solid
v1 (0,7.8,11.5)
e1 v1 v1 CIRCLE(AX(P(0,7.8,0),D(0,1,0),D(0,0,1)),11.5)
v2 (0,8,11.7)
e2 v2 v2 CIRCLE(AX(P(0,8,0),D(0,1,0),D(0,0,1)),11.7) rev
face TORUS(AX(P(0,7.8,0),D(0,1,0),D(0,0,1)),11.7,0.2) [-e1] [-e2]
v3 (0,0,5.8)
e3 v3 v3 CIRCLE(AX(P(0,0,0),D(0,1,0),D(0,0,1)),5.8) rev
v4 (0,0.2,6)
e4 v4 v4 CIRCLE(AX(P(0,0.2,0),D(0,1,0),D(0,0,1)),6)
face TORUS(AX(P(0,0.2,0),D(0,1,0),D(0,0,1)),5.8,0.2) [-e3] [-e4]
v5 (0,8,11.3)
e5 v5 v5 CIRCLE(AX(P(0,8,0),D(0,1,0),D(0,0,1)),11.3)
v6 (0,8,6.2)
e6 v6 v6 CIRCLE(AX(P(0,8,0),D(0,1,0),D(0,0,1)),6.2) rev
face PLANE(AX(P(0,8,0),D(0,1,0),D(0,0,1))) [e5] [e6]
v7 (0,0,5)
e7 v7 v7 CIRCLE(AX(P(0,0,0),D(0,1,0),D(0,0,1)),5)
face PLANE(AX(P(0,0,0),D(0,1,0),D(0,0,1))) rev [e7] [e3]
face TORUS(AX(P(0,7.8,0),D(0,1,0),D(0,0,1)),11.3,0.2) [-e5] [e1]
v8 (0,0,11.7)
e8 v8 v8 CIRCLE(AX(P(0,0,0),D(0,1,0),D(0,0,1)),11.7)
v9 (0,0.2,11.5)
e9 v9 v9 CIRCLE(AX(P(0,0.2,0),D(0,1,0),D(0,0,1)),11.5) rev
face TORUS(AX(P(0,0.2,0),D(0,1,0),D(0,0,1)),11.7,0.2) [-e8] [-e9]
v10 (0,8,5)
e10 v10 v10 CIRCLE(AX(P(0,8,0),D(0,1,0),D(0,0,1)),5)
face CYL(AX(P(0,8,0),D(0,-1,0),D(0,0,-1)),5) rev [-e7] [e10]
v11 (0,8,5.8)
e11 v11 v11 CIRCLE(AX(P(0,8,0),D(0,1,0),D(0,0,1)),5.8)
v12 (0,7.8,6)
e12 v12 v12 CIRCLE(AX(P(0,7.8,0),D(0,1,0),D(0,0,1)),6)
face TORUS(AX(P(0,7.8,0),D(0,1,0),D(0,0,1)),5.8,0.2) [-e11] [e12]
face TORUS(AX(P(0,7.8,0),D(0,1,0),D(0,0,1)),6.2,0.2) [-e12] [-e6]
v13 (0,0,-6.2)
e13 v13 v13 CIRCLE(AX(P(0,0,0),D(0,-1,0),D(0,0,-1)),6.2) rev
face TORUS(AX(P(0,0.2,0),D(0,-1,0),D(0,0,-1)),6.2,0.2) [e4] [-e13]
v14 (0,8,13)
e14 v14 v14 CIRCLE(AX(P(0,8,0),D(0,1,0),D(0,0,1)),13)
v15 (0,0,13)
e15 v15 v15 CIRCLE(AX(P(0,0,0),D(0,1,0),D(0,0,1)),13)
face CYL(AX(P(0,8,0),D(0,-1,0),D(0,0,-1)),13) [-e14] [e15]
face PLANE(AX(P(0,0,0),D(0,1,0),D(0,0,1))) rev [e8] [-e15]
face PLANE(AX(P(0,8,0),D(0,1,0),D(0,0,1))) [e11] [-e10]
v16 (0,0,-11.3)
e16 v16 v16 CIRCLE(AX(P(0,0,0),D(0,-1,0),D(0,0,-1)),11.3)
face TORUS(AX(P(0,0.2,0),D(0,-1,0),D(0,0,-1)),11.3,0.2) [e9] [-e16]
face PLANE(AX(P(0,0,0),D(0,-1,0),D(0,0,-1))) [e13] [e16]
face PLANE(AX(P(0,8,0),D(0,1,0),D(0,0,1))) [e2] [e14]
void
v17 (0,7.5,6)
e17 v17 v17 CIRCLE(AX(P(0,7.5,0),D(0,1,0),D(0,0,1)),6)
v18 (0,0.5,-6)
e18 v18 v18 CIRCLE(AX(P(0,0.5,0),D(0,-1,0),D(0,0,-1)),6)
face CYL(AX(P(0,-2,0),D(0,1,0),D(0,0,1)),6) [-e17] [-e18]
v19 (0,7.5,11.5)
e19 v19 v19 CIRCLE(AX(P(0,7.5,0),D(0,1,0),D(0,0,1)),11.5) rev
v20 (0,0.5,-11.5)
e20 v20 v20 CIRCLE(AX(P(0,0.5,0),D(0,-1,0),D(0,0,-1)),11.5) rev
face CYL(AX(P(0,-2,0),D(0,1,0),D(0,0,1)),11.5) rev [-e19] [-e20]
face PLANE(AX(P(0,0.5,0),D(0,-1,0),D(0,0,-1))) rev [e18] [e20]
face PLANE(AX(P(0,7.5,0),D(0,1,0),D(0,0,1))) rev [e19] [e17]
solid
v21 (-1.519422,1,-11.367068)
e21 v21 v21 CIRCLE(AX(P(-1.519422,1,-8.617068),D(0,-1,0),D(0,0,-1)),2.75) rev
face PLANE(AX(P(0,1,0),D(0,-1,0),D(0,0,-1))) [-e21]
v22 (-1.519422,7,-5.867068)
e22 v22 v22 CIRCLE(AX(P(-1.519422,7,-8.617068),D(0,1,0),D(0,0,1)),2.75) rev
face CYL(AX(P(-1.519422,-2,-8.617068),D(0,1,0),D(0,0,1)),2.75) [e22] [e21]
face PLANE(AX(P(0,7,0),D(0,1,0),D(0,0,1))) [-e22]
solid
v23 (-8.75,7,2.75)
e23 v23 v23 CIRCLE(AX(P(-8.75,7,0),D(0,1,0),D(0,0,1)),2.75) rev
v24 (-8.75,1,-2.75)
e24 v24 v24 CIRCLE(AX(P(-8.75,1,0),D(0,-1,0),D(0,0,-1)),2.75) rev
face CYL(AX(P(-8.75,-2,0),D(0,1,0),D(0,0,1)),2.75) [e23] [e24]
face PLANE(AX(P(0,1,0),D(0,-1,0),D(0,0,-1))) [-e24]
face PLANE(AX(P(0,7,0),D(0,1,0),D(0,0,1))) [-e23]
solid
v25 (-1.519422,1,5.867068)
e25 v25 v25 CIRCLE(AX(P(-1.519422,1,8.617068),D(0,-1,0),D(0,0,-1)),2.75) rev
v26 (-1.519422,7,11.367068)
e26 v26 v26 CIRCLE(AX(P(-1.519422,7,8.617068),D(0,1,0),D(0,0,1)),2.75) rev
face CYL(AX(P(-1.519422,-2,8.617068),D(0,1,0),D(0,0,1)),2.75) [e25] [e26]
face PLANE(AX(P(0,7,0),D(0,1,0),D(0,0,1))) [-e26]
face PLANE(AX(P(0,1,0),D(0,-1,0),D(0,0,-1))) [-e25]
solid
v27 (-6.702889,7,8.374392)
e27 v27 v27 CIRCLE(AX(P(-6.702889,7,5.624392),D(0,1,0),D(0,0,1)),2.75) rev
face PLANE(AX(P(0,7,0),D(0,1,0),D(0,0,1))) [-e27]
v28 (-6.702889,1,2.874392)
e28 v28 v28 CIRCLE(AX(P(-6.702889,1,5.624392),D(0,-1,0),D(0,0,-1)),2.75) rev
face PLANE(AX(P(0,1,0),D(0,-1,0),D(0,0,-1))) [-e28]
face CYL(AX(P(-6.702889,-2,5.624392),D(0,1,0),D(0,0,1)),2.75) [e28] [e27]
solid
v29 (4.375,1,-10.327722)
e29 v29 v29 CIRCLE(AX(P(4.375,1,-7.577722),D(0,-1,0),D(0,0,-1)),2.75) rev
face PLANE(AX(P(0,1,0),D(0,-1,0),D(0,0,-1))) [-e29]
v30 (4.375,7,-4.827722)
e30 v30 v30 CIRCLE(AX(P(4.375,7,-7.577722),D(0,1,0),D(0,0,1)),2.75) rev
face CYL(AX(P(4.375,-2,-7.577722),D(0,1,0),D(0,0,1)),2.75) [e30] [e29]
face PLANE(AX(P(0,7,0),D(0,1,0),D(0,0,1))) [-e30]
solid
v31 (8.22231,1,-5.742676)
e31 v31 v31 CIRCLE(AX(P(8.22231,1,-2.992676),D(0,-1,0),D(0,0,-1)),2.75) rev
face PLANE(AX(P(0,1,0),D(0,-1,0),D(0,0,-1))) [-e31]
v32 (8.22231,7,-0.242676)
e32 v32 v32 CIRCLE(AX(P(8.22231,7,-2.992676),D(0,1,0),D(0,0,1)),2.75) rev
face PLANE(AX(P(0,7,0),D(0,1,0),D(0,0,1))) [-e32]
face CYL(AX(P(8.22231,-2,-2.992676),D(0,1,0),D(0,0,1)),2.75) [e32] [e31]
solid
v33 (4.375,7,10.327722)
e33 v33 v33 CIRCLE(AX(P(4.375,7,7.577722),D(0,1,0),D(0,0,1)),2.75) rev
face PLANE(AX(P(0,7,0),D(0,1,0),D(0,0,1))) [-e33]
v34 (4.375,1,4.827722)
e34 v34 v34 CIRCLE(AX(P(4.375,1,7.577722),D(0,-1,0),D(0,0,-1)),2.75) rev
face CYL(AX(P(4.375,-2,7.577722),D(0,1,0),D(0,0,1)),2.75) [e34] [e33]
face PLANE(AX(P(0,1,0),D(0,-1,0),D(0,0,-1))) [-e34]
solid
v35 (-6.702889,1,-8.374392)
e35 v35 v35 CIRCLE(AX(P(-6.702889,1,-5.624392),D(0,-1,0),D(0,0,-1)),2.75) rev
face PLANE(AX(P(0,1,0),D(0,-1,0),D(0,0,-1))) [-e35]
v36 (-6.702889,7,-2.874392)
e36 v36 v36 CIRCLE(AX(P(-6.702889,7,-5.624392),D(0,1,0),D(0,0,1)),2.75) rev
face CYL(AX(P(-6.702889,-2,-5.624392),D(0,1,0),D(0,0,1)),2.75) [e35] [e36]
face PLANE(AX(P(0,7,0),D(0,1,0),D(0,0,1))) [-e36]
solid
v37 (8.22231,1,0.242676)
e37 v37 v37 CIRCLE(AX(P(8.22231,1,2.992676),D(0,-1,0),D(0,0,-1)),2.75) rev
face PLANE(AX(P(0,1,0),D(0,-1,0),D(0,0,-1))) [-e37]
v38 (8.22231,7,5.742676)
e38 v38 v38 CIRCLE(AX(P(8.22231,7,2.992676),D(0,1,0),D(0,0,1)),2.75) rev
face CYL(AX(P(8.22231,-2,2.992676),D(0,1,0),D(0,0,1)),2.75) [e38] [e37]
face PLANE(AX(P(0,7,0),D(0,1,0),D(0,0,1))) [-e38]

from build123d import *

# Parameters (mm, degrees)
SKETCH2_R           = 13
SKETCH2_R_2         = 5
BOSS_EXTRUDE1_DEPTH = 8
SKETCH1_R           = 11.5
SKETCH1_R_2         = 6
SKETCH1_R_3         = 2.75
CUT_EXTRUDE2_DEPTH  = 10
SKETCH4_R           = 11.5
SKETCH4_R_2         = 6
CUT_EXTRUDE3_DEPTH  = 1
SKETCH5_R           = 11.5
SKETCH5_R_2         = 6
CUT_EXTRUDE4_DEPTH  = 1
FILLET1_R           = 0.2
FILLET2_R           = 0.2
SKETCH7_R           = 11.5
SKETCH7_R_2         = 6
BOSS_EXTRUDE2_DEPTH = 0.5
FILLET3_R           = 0.2
FILLET4_R           = 0.2
SKETCH9_R           = 11.5
SKETCH9_R_2         = 6
BOSS_EXTRUDE3_DEPTH = 0.5
FILLET5_R           = 0.2
FILLET6_R           = 0.2
FILLET7_R           = 0.2
FILLET8_R           = 0.2


with BuildPart() as part:
    # Sketch2 → Boss-Extrude1 (new body)
    with BuildSketch(Plane(origin=(0, 0, 0), x_dir=(1, 0, 0), z_dir=(0, 1, 0))):
        with Locations(Location((0, 0, 0), (0, 0, 270))):
            Circle(SKETCH2_R)
        with Locations(Location((0, 0, 0), (0, 0, 270))):
            Circle(SKETCH2_R_2, mode=Mode.SUBTRACT)
    extrude(amount=BOSS_EXTRUDE1_DEPTH)

    # Sketch1 → Cut-Extrude2 (cut)
    with BuildSketch(Plane(origin=(0, 8, 0), x_dir=(1, 0, 0), z_dir=(0, 1, 0))):
        with Locations(Location((0, 0, 0), (0, 0, 270))):
            Circle(SKETCH1_R)
        with Locations(Location((0, 0, 0), (0, 0, 270))):
            Circle(SKETCH1_R_2, mode=Mode.SUBTRACT)
        with Locations(Location((-8.75, 0, 0), (0, 0, 270))):
            Circle(SKETCH1_R_3, mode=Mode.SUBTRACT)
        with Locations(Location((-6.702888877, 5.624391585, 0), (0, 0, 270))):
            Circle(SKETCH1_R_3, mode=Mode.SUBTRACT)
        with Locations(Location((-1.519421555, 8.617067839, 0), (0, 0, 270))):
            Circle(SKETCH1_R_3, mode=Mode.SUBTRACT)
        with Locations(Location((4.375, 7.577722283, 0), (0, 0, 270))):
            Circle(SKETCH1_R_3, mode=Mode.SUBTRACT)
        with Locations(Location((8.222310432, 2.992676254, 0), (0, 0, 270))):
            Circle(SKETCH1_R_3, mode=Mode.SUBTRACT)
        with Locations(Location((8.222310432, -2.992676254, 0), (0, 0, 270))):
            Circle(SKETCH1_R_3, mode=Mode.SUBTRACT)
        with Locations(Location((4.375, -7.577722283, 0), (0, 0, 270))):
            Circle(SKETCH1_R_3, mode=Mode.SUBTRACT)
        with Locations(Location((-1.519421555, -8.617067839, 0), (0, 0, 270))):
            Circle(SKETCH1_R_3, mode=Mode.SUBTRACT)
        with Locations(Location((-6.702888877, -5.624391585, 0), (0, 0, 270))):
            Circle(SKETCH1_R_3, mode=Mode.SUBTRACT)
    extrude(amount=-CUT_EXTRUDE2_DEPTH, mode=Mode.SUBTRACT)


with BuildPart() as cut_extrude2_piece_1:
    # of the separate pieces the step leaves, piece 1, a body of its own (cut_extrude2_pieces)
    add(part.part.solids().sort_by_distance((0, 0, 13))[0])

    # Fillet2
    fillet2_edges = [cut_extrude2_piece_1.edges().sort_by_distance(p)[0] for p in [
        (0, 8, -11.5),
    ]]
    fillet(fillet2_edges, radius=FILLET2_R)



with BuildPart() as cut_extrude2_piece_2:
    # of the separate pieces the step leaves, piece 2, a body of its own (cut_extrude2_pieces)
    add(part.part.solids().sort_by_distance((0, 0, 6))[0])

    # Fillet1
    fillet1_edges = [cut_extrude2_piece_2.edges().sort_by_distance(p)[0] for p in [
        (0, 8, -6),
    ]]
    fillet(fillet1_edges, radius=FILLET1_R)


with BuildPart() as cut_extrude2_piece_3:
    # of the separate pieces the step leaves, piece 3, a body of its own (cut_extrude2_pieces)
    add(part.part.solids().sort_by_distance((-1.519421555, 0, 11.367067839))[0])


with BuildPart() as cut_extrude2_piece_4:
    # of the separate pieces the step leaves, piece 4, a body of its own (cut_extrude2_pieces)
    add(part.part.solids().sort_by_distance((-6.702888877, 0, 8.374391585))[0])


with BuildPart() as cut_extrude2_piece_5:
    # of the separate pieces the step leaves, piece 5, a body of its own (cut_extrude2_pieces)
    add(part.part.solids().sort_by_distance((8.222310432, 0, -0.242676254))[0])


with BuildPart() as cut_extrude2_piece_6:
    # of the separate pieces the step leaves, piece 6, a body of its own (cut_extrude2_pieces)
    add(part.part.solids().sort_by_distance((4.375, 0, -4.827722283))[0])


with BuildPart() as cut_extrude2_piece_7:
    # of the separate pieces the step leaves, piece 7, a body of its own (cut_extrude2_pieces)
    add(part.part.solids().sort_by_distance((-8.75, 0, 2.75))[0])


with BuildPart() as cut_extrude2_piece_8:
    # of the separate pieces the step leaves, piece 8, a body of its own (cut_extrude2_pieces)
    add(part.part.solids().sort_by_distance((8.222310432, 0, 5.742676254))[0])


with BuildPart() as cut_extrude2_piece_9:
    # of the separate pieces the step leaves, piece 9, a body of its own (cut_extrude2_pieces)
    add(part.part.solids().sort_by_distance((-6.702888877, 0, -2.874391585))[0])


with BuildPart() as cut_extrude2_piece_10:
    # of the separate pieces the step leaves, piece 10, a body of its own (cut_extrude2_pieces)
    add(part.part.solids().sort_by_distance((4.375, 0, 10.327722283))[0])


with BuildPart() as cut_extrude2_piece_11:
    # of the separate pieces the step leaves, piece 11, a body of its own (cut_extrude2_pieces)
    add(part.part.solids().sort_by_distance((-1.519421555, 0, -5.867067839))[0])


with BuildPart() as cut_extrude3_tool:
    # Sketch4 → Cut-Extrude3 (new body)
    with BuildSketch(Plane(origin=(0, 8, 0), x_dir=(1, 0, 0), z_dir=(0, 1, 0))):
        with Locations(Location((0, 0, 0), (0, 0, 270))):
            Circle(SKETCH4_R)
        with Locations(Location((0, 0, 0), (0, 0, 270))):
            Circle(SKETCH4_R_2, mode=Mode.SUBTRACT)
    extrude(amount=-CUT_EXTRUDE3_DEPTH)


with BuildPart() as cut_extrude2_piece_3_1:
    add(cut_extrude2_piece_3.part)

    # Cut-Extrude3: cut by cut_extrude3_tool
    add(cut_extrude3_tool.part, mode=Mode.SUBTRACT)


with BuildPart() as cut_extrude2_piece_4_1:
    add(cut_extrude2_piece_4.part)

    # Cut-Extrude3: cut by cut_extrude3_tool
    add(cut_extrude3_tool.part, mode=Mode.SUBTRACT)


with BuildPart() as cut_extrude2_piece_5_1:
    add(cut_extrude2_piece_5.part)

    # Cut-Extrude3: cut by cut_extrude3_tool
    add(cut_extrude3_tool.part, mode=Mode.SUBTRACT)


with BuildPart() as cut_extrude2_piece_6_1:
    add(cut_extrude2_piece_6.part)

    # Cut-Extrude3: cut by cut_extrude3_tool
    add(cut_extrude3_tool.part, mode=Mode.SUBTRACT)


with BuildPart() as cut_extrude2_piece_7_1:
    add(cut_extrude2_piece_7.part)

    # Cut-Extrude3: cut by cut_extrude3_tool
    add(cut_extrude3_tool.part, mode=Mode.SUBTRACT)


with BuildPart() as cut_extrude2_piece_8_1:
    add(cut_extrude2_piece_8.part)

    # Cut-Extrude3: cut by cut_extrude3_tool
    add(cut_extrude3_tool.part, mode=Mode.SUBTRACT)


with BuildPart() as cut_extrude2_piece_9_1:
    add(cut_extrude2_piece_9.part)

    # Cut-Extrude3: cut by cut_extrude3_tool
    add(cut_extrude3_tool.part, mode=Mode.SUBTRACT)


with BuildPart() as cut_extrude2_piece_10_1:
    add(cut_extrude2_piece_10.part)

    # Cut-Extrude3: cut by cut_extrude3_tool
    add(cut_extrude3_tool.part, mode=Mode.SUBTRACT)


with BuildPart() as cut_extrude2_piece_11_1:
    add(cut_extrude2_piece_11.part)

    # Cut-Extrude3: cut by cut_extrude3_tool
    add(cut_extrude3_tool.part, mode=Mode.SUBTRACT)


with BuildPart() as cut_extrude4_tool:
    # Sketch5 → Cut-Extrude4 (new body)
    with BuildSketch(Plane.XZ):
        with Locations(Location((0, 0, 0), (0, 0, 90))):
            Circle(SKETCH5_R)
        with Locations(Location((0, 0, 0), (0, 0, 90))):
            Circle(SKETCH5_R_2, mode=Mode.SUBTRACT)
    extrude(amount=-CUT_EXTRUDE4_DEPTH)


with BuildPart() as cut_extrude2_piece_3_2:
    add(cut_extrude2_piece_3_1.part)

    # Cut-Extrude4: cut by cut_extrude4_tool
    add(cut_extrude4_tool.part, mode=Mode.SUBTRACT)


with BuildPart() as cut_extrude2_piece_4_2:
    add(cut_extrude2_piece_4_1.part)

    # Cut-Extrude4: cut by cut_extrude4_tool
    add(cut_extrude4_tool.part, mode=Mode.SUBTRACT)


with BuildPart() as cut_extrude2_piece_5_2:
    add(cut_extrude2_piece_5_1.part)

    # Cut-Extrude4: cut by cut_extrude4_tool
    add(cut_extrude4_tool.part, mode=Mode.SUBTRACT)


with BuildPart() as cut_extrude2_piece_6_2:
    add(cut_extrude2_piece_6_1.part)

    # Cut-Extrude4: cut by cut_extrude4_tool
    add(cut_extrude4_tool.part, mode=Mode.SUBTRACT)


with BuildPart() as cut_extrude2_piece_7_2:
    add(cut_extrude2_piece_7_1.part)

    # Cut-Extrude4: cut by cut_extrude4_tool
    add(cut_extrude4_tool.part, mode=Mode.SUBTRACT)


with BuildPart() as cut_extrude2_piece_8_2:
    add(cut_extrude2_piece_8_1.part)

    # Cut-Extrude4: cut by cut_extrude4_tool
    add(cut_extrude4_tool.part, mode=Mode.SUBTRACT)


with BuildPart() as cut_extrude2_piece_9_2:
    add(cut_extrude2_piece_9_1.part)

    # Cut-Extrude4: cut by cut_extrude4_tool
    add(cut_extrude4_tool.part, mode=Mode.SUBTRACT)


with BuildPart() as cut_extrude2_piece_10_2:
    add(cut_extrude2_piece_10_1.part)

    # Cut-Extrude4: cut by cut_extrude4_tool
    add(cut_extrude4_tool.part, mode=Mode.SUBTRACT)


with BuildPart() as cut_extrude2_piece_11_2:
    add(cut_extrude2_piece_11_1.part)

    # Cut-Extrude4: cut by cut_extrude4_tool
    add(cut_extrude4_tool.part, mode=Mode.SUBTRACT)


with BuildPart() as cut_extrude2_piece_1_1:
    add(cut_extrude2_piece_1.part)

    add(cut_extrude2_piece_2.part)  # Boss-Extrude2 merges Cut-Extrude2 piece 2
    # Sketch7 → Boss-Extrude2 (add)
    with BuildSketch(Plane(origin=(0, 8, 0), x_dir=(1, 0, 0), z_dir=(0, 1, 0))):
        with Locations(Location((0, 0, 0), (0, 0, 270))):
            Circle(SKETCH7_R)
        with Locations(Location((0, 0, 0), (0, 0, 270))):
            Circle(SKETCH7_R_2, mode=Mode.SUBTRACT)
    extrude(amount=-BOSS_EXTRUDE2_DEPTH)

    # Fillet3
    fillet3_edges = [cut_extrude2_piece_1_1.edges().sort_by_distance(p)[0] for p in [
        (0, 0, -6),
    ]]
    fillet(fillet3_edges, radius=FILLET3_R)

    # Fillet4
    fillet4_edges = [cut_extrude2_piece_1_1.edges().sort_by_distance(p)[0] for p in [
        (0, 0, -11.5),
    ]]
    fillet(fillet4_edges, radius=FILLET4_R)

    # Sketch9 → Boss-Extrude3 (add)
    with BuildSketch(Plane(origin=(0, 0, 0), x_dir=(-1, 0, 0), z_dir=(0, -1, 0))):
        with Locations(Location((0, 0, 0), (0, 0, 270))):
            Circle(SKETCH9_R)
        with Locations(Location((0, 0, 0), (0, 0, 270))):
            Circle(SKETCH9_R_2, mode=Mode.SUBTRACT)
    extrude(amount=-BOSS_EXTRUDE3_DEPTH)

    # Fillet5
    fillet5_edges = [cut_extrude2_piece_1_1.edges().sort_by_distance(p)[0] for p in [
        (0, 0, -11.5),
    ]]
    fillet(fillet5_edges, radius=FILLET5_R - 0.0001)  # a hair under: the kernel refuses the full size

    # Fillet6
    fillet6_edges = [cut_extrude2_piece_1_1.edges().sort_by_distance(p)[0] for p in [
        (0, 0, -6),
    ]]
    fillet(fillet6_edges, radius=FILLET6_R - 0.0001)  # a hair under: the kernel refuses the full size

    # Fillet7
    fillet7_edges = [cut_extrude2_piece_1_1.edges().sort_by_distance(p)[0] for p in [
        (0, 8, -6),
    ]]
    fillet(fillet7_edges, radius=FILLET7_R - 0.0001)  # a hair under: the kernel refuses the full size

    # Fillet8
    fillet8_edges = [cut_extrude2_piece_1_1.edges().sort_by_distance(p)[0] for p in [
        (0, 8, -11.5),
    ]]
    fillet(fillet8_edges, radius=FILLET8_R - 0.0001)  # a hair under: the kernel refuses the full size


solid = Compound([cut_extrude2_piece_3_2.part, cut_extrude2_piece_4_2.part, cut_extrude2_piece_5_2.part, cut_extrude2_piece_6_2.part, cut_extrude2_piece_7_2.part, cut_extrude2_piece_8_2.part, cut_extrude2_piece_9_2.part, cut_extrude2_piece_10_2.part, cut_extrude2_piece_11_2.part, cut_extrude2_piece_1_1.part])
